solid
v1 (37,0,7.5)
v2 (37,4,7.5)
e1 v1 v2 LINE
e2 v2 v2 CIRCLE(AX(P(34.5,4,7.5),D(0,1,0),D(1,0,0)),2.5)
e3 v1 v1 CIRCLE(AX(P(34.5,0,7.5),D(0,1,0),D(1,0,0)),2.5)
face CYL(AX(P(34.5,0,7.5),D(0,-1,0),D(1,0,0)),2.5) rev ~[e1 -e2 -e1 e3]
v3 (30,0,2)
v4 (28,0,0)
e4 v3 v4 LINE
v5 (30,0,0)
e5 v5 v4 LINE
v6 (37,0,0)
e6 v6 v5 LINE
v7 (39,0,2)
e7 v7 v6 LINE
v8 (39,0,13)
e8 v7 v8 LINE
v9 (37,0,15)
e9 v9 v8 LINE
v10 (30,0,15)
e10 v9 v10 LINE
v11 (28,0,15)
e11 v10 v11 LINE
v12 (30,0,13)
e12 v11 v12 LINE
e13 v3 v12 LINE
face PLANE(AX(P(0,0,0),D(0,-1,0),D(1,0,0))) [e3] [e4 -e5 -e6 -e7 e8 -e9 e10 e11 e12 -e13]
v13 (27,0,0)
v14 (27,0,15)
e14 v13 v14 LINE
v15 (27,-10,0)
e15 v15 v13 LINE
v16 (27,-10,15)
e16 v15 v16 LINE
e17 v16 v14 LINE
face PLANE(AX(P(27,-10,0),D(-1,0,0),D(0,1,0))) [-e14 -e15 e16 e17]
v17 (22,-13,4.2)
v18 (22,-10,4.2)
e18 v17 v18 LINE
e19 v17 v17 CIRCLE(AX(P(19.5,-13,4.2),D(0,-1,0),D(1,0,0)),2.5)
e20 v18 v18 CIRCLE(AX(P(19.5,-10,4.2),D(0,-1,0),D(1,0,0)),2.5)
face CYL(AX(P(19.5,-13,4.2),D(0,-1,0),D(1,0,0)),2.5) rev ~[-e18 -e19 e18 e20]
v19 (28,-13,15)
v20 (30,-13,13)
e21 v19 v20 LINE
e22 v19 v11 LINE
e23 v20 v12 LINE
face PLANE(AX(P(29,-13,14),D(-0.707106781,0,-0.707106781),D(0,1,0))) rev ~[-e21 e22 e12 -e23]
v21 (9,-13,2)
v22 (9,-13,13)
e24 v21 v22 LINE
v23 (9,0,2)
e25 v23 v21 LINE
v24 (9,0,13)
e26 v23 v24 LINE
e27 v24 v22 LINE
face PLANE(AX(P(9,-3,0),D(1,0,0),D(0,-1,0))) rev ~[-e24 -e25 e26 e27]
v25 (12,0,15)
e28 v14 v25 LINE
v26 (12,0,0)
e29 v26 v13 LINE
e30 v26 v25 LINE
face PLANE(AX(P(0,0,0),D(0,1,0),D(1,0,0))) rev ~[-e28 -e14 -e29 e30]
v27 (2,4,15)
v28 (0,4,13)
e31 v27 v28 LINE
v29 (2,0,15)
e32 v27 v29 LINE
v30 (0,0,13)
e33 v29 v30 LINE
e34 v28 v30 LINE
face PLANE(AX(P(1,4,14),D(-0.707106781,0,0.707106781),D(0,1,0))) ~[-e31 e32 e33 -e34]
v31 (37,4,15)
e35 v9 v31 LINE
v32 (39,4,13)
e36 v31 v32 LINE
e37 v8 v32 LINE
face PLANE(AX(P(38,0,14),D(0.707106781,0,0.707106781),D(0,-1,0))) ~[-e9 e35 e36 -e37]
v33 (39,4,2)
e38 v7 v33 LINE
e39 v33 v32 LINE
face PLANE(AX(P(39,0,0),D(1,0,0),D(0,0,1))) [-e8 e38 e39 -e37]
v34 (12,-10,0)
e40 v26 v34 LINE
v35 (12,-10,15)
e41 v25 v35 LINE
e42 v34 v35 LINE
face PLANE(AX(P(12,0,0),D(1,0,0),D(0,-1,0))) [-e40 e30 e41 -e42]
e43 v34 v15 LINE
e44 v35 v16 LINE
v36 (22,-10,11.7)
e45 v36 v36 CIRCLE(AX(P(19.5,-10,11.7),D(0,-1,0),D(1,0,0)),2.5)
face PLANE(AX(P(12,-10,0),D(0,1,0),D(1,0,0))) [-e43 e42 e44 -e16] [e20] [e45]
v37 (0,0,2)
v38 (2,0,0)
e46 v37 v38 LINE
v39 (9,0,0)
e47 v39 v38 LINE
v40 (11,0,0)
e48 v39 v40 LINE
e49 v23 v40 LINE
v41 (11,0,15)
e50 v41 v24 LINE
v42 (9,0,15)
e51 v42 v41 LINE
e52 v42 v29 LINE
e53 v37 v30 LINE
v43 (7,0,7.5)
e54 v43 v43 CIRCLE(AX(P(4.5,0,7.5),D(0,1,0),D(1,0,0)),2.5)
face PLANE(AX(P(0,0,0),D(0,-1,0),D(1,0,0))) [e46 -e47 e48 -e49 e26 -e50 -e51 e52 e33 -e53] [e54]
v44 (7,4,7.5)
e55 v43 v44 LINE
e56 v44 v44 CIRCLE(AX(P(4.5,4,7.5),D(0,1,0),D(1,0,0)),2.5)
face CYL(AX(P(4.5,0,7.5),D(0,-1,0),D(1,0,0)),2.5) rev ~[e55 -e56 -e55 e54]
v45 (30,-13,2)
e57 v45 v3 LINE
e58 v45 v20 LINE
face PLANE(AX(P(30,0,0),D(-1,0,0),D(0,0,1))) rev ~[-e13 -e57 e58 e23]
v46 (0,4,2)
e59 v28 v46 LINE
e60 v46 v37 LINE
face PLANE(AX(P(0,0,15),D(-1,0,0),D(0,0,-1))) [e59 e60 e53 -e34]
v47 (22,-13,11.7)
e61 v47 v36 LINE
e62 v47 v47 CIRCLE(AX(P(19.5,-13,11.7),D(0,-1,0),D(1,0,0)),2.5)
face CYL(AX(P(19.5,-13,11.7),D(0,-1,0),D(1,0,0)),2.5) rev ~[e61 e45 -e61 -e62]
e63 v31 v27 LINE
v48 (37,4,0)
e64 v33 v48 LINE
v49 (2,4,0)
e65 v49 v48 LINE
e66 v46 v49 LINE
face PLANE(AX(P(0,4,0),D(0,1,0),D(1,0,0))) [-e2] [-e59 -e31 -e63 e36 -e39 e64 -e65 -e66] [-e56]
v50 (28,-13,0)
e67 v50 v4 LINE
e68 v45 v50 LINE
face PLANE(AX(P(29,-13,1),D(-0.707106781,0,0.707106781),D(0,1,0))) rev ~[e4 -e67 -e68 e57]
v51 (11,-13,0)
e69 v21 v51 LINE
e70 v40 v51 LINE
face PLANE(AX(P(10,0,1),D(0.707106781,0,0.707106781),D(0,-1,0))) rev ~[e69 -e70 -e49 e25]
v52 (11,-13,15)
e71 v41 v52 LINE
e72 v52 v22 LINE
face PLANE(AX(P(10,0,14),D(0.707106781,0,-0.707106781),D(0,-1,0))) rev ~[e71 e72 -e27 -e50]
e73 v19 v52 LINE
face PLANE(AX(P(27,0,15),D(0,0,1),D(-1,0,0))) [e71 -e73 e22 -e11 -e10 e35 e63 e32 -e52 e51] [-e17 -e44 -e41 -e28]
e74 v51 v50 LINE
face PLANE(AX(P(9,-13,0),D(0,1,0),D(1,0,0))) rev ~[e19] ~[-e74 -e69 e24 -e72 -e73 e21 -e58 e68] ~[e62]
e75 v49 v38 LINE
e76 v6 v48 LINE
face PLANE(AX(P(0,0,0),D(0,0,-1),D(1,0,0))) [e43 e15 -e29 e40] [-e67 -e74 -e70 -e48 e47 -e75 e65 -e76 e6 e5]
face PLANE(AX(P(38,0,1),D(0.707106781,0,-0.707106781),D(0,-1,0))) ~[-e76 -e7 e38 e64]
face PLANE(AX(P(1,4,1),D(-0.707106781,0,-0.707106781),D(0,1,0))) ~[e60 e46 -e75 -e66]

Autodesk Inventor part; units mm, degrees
ref_plane "YZ Plane" through (0, 0, 0) normal (1, 0, 0) x (0, 1, 0)
ref_plane "XZ Plane" through (0, 0, 0) normal (0, 1, 0) x (-1, 0, 0)
ref_plane "XY Plane" through (0, 0, 0) normal (0, 0, 1) x (1, 0, 0)
sketch "Sketch4" plane through (0, 0, 0) normal (0, 0, 1) x (1, 0, 0)
  line L0 (0, 0) -> (12, 0)
  line L1 (12, 0) -> (12, -10)
  line L2 (12, -10) -> (27, -10)
  line L3 (27, -10) -> (27, 0)
  line L4 (27, 0) -> (39, 0)
  line L5 (0, -3) -> (9, -3)
  line L6 (9, -3) -> (9, -13)
  line L7 (9, -13) -> (30, -13)
  line L8 (30, -13) -> (30, -3)
  line L9 (30, -3) -> (39, -3)
  line L10 (0, -3) -> (0, 0)
  line L11 (39, -3) -> (39, 0)
  dimension "d14" = 12
  dimension "d15" = 12
  dimension "d16" = 10
  dimension "d17" = 15
  dimension "d18" = 3
extrude "Extrusion4" add sketch "Sketch4" along normal blind 30
sketch "Sketch5" plane through (0, 0, 0) normal (0, 1, 0) x (1, 0, 0)
  line L0 (9, 0) -> (0, 0) construction
  line L1 (9, 0) -> (9, -30) construction
  line L2 (0, -30) -> (9, -30) construction
  line L3 (0, 0) -> (0, -30) construction
  line L4 (39, 0) -> (30, 0) construction
  line L5 (39, 0) -> (39, -30) construction
  line L6 (30, -30) -> (39, -30) construction
  line L7 (30, 0) -> (30, -30) construction
  circle A0 centre (4.5, -22.5) radius 2.5
  circle A1 centre (4.5, -7.5) radius 2.5
  line L8 (4.5, -22.5) -> (4.5, -7.5) construction
  line L9 (19.5, -30) -> (19.5, 0)
  line L10 (12, 0) -> (27, 0) projected
  line L11 (27, -30) -> (12, -30) projected
  circle A2 centre (34.5, -22.5) radius 2.5
  circle A3 centre (34.5, -7.5) radius 2.5
  line L12 (34.5, -22.5) -> (34.5, -7.5) construction
  point P0 (4.5, -30)
  point P1 (4.5, 0)
  point P2 (4.5, -15)
  point P3 (0, -15)
  point P4 (34.5, -15)
  dimension "d21" = 5
  dimension "d22" = 5
  dimension "d23" = 15
extrude "Extrusion5" cut sketch "Sketch5" against normal through all
sketch "Sketch6" plane through (9, -13, 0) normal (0, -1, 0) x (1, 0, 0)
  line L0 (3, 30) -> (-9, 30) projected
  line L1 (30, 0) -> (30, 30) projected
  line L2 (-9, 30) -> (30, 30)
  line L3 (30, 30) -> (30, 15)
  line L4 (30, 15) -> (-9, 15)
  line L5 (-9, 15) -> (-9, 30)
  point P0 (-9, 0)
extrude "Extrusion6" cut sketch "Sketch6" against normal through all
sketch "Sketch7" plane through (9, -13, 0) normal (0, -1, 0) x (1, 0, 0)
  circle A0 centre (10.5, 11.7) radius 2.5
  circle A1 centre (10.5, 4.2) radius 2.5
  line L0 (10.5, 4.2) -> (10.5, 11.7) construction
  line L1 (21, 15) -> (0, 15) projected
  point P0 (-9, 0)
  point P1 (10.5, 15)
  dimension "d28" = 5
  dimension "d29" = 5
  dimension "d30" = 7.5
  dimension "d31" = 3.3
extrude "Extrusion7" cut sketch "Sketch7" against normal through all
sketch "Sketch8" plane through (0, 0, 0) normal (0, 1, 0) x (1, 0, 0)
  line L0 (27, -15) -> (39, -15) projected
  line L1 (0, 0) -> (39, 0)
  line L2 (39, 0) -> (39, -15)
  line L3 (39, -15) -> (0, -15)
  line L4 (0, -15) -> (0, 0)
  circle A0 centre (4.5, -7.5) radius 2.5 projected
  circle A1 centre (34.5, -7.5) radius 2.5 projected
extrude "Extrusion8" add sketch "Sketch8" along normal blind 4
sketch "Sketch9" plane through (0, 0, 0) normal (0, -1, 0) x (1, 0, 0)
  line L0 (9, 15) -> (0, 15) projected
  line L1 (0, 0) -> (0, 15) projected
  line L2 (9, 0) -> (0, 0) projected
  line L3 (9, 0) -> (9, 15) projected
  circle A0 centre (4.5, 7.5) radius 2.5 projected
  line L4 (39, 15) -> (30, 15) projected
  line L5 (30, 0) -> (30, 15) projected
  line L6 (39, 0) -> (30, 0) projected
  line L7 (39, 0) -> (39, 15) projected
  circle A1 centre (34.5, 7.5) radius 2.5 projected
extrude "Extrusion9" cut sketch "Sketch9" along normal through all
chamfer "Chamfer1" distance 2 angle 45 4 edges at (9, -6.5, 15) (30, -6.5, 15) (30, -6.5, 0) (9, -6.5, 0)
chamfer "Chamfer2" distance 2 angle 45 4 edges at (39, 2, 15) (39, 2, 0) (0, 2, 0) (0, 2, 15)
equation "\"d15\" = d14"
properties part number "WA03" material "ABS Plastic"
